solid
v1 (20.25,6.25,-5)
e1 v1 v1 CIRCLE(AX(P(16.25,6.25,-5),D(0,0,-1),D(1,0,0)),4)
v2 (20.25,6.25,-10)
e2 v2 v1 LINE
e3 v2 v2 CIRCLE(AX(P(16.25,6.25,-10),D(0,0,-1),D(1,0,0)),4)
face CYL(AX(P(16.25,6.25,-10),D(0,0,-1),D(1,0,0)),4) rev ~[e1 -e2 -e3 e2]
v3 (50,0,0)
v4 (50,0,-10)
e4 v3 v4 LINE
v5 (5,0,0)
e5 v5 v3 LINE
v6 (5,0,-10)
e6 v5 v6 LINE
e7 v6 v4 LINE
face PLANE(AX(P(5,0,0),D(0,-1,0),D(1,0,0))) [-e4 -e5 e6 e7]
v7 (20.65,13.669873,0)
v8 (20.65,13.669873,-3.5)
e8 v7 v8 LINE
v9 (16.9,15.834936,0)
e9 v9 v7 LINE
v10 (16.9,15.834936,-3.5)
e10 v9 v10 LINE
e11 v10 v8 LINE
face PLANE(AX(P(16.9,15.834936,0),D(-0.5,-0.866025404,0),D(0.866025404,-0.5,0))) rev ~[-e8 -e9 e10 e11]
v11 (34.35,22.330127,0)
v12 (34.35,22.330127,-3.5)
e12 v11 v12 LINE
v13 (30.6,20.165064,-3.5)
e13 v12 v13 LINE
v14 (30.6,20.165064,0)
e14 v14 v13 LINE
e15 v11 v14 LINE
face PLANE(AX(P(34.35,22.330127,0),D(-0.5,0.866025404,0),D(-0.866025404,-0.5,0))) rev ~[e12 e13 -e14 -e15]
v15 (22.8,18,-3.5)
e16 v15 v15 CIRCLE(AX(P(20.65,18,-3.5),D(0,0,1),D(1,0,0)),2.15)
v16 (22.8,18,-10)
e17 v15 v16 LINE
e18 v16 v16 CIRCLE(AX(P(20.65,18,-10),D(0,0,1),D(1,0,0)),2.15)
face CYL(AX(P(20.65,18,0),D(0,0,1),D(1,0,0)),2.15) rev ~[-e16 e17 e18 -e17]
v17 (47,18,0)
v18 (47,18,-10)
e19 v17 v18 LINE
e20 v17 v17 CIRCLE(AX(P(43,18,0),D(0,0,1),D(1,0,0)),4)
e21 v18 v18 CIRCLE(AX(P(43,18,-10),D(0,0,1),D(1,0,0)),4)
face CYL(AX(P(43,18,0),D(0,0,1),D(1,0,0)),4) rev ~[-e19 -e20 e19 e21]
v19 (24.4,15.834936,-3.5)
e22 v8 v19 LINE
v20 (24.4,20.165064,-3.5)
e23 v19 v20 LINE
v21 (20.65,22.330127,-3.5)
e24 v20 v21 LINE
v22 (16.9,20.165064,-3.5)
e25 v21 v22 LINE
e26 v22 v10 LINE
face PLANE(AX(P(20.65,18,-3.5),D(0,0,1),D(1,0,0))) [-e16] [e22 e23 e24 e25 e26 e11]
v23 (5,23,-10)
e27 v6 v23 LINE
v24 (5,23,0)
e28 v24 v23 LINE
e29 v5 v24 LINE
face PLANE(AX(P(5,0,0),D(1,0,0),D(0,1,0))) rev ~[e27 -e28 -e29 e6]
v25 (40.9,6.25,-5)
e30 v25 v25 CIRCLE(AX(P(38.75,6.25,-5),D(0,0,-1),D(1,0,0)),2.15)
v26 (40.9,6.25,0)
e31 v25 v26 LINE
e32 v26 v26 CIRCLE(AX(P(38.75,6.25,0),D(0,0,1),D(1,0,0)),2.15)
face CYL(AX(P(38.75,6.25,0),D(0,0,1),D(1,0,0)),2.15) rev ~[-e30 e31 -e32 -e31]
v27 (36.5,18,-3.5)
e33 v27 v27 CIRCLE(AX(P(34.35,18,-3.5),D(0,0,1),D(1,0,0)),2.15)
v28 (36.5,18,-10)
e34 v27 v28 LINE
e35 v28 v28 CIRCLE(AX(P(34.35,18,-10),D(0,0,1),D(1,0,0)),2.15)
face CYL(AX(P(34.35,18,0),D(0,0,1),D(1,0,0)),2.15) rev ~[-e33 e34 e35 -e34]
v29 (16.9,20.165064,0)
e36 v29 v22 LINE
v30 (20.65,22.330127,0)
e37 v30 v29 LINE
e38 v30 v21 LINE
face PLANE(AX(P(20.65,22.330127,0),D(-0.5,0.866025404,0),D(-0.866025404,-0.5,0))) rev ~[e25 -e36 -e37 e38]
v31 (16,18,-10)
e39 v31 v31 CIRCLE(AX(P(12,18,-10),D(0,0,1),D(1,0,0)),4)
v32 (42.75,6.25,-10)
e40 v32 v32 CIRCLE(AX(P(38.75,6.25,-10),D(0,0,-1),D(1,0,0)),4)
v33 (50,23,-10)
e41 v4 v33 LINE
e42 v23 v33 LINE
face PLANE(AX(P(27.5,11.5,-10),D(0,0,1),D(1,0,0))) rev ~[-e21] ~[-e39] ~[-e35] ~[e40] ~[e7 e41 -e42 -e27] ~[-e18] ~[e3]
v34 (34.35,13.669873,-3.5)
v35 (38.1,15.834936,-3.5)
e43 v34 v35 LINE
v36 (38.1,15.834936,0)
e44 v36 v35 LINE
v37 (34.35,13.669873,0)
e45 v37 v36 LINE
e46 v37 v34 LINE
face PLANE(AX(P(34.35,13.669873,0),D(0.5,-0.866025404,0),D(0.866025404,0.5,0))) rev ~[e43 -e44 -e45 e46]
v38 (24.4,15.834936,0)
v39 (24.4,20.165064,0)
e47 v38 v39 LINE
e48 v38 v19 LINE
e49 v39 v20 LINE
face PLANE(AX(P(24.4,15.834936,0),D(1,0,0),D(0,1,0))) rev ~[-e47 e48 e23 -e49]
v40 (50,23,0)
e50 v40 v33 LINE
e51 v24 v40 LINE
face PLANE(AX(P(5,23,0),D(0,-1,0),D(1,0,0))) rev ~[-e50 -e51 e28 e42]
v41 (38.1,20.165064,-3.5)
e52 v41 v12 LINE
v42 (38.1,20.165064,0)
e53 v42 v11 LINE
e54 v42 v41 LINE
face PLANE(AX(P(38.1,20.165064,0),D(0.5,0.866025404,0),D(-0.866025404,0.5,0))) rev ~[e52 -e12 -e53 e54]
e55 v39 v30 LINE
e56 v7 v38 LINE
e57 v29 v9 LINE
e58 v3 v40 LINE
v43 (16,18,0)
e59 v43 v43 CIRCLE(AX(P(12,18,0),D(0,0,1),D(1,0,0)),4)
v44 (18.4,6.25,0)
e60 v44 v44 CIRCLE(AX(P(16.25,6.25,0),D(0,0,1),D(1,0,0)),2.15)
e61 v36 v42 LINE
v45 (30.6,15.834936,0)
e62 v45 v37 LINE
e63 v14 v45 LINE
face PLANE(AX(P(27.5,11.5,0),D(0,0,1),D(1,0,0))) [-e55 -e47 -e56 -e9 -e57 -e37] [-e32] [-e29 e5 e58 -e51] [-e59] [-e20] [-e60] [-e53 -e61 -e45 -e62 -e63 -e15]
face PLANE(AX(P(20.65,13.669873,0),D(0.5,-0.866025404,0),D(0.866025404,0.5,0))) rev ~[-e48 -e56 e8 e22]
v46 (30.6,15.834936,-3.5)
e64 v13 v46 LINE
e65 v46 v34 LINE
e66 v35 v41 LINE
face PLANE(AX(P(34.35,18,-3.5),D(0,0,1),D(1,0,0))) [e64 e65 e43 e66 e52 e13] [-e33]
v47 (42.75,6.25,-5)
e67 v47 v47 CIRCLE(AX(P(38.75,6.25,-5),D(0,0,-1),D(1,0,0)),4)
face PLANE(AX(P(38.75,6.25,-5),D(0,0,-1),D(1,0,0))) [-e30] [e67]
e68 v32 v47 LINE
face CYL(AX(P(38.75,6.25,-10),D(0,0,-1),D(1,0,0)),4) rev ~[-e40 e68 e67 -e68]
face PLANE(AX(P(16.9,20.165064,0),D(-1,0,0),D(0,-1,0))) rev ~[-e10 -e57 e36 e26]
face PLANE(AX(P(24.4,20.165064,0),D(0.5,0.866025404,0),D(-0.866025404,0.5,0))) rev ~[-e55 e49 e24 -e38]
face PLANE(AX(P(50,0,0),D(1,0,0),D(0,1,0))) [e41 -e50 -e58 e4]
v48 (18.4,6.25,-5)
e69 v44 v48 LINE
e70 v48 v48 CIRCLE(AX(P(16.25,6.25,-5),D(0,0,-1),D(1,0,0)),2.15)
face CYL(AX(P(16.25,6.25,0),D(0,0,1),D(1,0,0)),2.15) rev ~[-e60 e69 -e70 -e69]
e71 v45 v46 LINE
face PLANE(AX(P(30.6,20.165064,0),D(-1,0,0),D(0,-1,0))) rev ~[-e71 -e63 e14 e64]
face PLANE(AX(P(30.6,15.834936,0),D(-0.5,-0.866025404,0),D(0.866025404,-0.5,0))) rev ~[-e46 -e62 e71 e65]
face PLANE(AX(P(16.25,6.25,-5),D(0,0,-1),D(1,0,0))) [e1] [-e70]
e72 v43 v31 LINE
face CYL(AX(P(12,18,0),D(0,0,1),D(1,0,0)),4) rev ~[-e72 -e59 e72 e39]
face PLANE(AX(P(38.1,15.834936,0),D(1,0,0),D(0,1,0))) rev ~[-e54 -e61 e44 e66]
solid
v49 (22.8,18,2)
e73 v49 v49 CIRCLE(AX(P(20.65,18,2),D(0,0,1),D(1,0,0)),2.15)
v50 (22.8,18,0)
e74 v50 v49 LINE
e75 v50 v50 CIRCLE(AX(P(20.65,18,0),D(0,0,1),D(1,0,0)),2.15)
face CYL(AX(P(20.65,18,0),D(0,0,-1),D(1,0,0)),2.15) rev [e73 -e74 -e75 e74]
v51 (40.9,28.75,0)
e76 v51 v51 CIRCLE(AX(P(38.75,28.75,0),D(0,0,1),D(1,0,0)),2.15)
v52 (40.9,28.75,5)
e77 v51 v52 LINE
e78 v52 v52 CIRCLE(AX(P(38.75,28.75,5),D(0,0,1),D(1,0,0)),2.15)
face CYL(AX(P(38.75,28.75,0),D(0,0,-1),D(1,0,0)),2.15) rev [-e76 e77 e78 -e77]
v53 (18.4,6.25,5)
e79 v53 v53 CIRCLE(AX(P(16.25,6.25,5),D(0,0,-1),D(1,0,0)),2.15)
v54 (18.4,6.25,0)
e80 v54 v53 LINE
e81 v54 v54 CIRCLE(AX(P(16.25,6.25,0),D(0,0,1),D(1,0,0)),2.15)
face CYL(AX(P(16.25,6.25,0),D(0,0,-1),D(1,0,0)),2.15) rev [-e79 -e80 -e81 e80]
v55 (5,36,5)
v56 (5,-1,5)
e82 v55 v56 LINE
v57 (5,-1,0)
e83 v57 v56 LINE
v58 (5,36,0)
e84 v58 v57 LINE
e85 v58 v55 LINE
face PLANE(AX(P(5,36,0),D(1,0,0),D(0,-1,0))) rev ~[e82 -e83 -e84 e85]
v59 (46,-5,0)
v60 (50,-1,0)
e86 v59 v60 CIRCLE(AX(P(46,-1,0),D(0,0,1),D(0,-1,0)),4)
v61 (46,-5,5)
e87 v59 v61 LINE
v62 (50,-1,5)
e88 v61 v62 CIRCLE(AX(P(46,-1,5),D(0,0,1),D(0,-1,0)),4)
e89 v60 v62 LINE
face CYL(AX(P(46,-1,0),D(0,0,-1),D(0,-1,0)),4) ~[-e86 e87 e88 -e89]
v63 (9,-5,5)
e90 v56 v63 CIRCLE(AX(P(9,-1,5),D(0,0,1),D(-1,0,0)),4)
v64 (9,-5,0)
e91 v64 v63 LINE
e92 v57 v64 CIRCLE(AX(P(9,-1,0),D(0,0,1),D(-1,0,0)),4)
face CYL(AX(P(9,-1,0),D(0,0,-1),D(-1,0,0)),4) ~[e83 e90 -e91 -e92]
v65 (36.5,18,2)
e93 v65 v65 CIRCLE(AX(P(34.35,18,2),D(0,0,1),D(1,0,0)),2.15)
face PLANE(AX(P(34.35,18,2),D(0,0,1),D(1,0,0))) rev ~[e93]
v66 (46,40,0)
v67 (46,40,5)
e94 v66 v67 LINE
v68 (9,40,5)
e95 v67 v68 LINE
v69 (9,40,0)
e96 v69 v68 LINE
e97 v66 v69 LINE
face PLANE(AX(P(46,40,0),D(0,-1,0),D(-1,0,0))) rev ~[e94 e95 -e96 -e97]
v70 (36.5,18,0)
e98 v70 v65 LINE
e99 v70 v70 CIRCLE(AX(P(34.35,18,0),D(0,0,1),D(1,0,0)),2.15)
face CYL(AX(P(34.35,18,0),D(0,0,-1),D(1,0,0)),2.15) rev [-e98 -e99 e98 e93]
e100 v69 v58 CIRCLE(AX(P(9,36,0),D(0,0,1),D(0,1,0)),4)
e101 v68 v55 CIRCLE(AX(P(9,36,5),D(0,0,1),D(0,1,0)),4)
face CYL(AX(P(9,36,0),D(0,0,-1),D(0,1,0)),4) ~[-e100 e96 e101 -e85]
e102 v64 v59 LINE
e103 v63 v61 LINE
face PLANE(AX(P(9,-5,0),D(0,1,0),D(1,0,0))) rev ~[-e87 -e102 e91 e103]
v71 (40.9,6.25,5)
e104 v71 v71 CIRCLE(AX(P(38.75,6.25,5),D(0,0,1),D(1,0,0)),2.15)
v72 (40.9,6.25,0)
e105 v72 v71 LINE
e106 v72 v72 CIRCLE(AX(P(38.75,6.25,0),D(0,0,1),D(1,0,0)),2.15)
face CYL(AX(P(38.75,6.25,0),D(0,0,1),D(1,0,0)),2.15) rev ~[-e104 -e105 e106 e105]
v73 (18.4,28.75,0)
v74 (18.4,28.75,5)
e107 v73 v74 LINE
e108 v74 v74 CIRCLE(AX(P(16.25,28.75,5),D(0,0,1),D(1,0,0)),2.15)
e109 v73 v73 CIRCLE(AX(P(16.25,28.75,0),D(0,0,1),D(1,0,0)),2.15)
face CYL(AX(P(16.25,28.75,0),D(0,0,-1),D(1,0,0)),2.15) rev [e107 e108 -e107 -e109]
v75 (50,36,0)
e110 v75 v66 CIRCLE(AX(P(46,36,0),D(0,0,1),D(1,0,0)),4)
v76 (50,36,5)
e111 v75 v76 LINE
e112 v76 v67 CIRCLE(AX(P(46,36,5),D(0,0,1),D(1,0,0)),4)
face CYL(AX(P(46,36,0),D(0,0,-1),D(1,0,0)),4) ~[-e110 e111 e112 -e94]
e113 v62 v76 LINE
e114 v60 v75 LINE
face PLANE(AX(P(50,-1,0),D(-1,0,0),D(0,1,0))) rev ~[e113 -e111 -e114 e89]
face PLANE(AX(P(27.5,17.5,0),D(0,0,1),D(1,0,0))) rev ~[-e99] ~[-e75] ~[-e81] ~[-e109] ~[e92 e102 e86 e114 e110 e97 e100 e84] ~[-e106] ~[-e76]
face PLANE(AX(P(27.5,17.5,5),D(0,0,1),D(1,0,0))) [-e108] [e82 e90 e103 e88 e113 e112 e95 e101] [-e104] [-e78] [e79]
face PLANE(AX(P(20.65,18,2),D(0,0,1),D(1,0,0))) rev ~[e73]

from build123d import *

# Parameters (mm, degrees)
F0_R     = 2.15
F2_DEPTH = 5
F1_W     = 45
F1_H     = 23
F1_R     = 4
F1_R_2   = 2.15
F3_DEPTH = 10
F4_DEPTH = 3.5
F5_DEPTH = 2
F6_DEPTH = 10
F7_R     = 4
F7_R_2   = 2.15
F8_DEPTH = 5


# Not quite as in the source:
# - a feature names something its author has since deleted; it is built from what else it names


with BuildPart() as f2:
    # F0 (on Top) → F2 (new body)
    with BuildSketch(Plane.XY):
        with BuildLine():
            ThreePointArc((5, -1), (6.1715728753, -3.8284271247), (9, -5))
            Line((9, -5), (46, -5))
            ThreePointArc((46, -5), (48.8284271247, -3.8284271247), (50, -1))
            Line((50, -1), (50, 36))
            ThreePointArc((50, 36), (48.8284271247, 38.8284271247), (46, 40))
            Line((46, 40), (9, 40))
            ThreePointArc((9, 40), (6.1715728753, 38.8284271247), (5, 36))
            Line((5, 36), (5, -1))
        make_face()
        with Locations((16.25, 6.25)):
            Circle(F0_R, mode=Mode.SUBTRACT)
        with Locations((38.75, 6.25)):
            Circle(F0_R, mode=Mode.SUBTRACT)
        with Locations((16.25, 28.75)):
            Circle(F0_R, mode=Mode.SUBTRACT)
        with Locations((38.75, 28.75)):
            Circle(F0_R, mode=Mode.SUBTRACT)
        with Locations((16.25, 6.25)):
            Circle(F0_R)
        with Locations((38.75, 6.25)):
            Circle(F0_R)
    extrude(amount=F2_DEPTH)

    # F1 (on Top) → F5 (cut)
    with BuildSketch(Plane.XY):
        with Locations((34.35, 18)):
            Circle(F1_R_2)
        with Locations((20.65, 18)):
            Circle(F1_R_2)
    extrude(amount=F5_DEPTH, mode=Mode.SUBTRACT)


with BuildPart() as f3:
    # F1 (on Top) → F3 (new body)
    with BuildSketch(Plane.XY):
        with Locations((27.5, 11.5)):
            Rectangle(F1_W, F1_H)
        with Locations((12, 18)):
            Circle(F1_R, mode=Mode.SUBTRACT)
        Polygon((20.65, 22.3301270189), (24.4, 20.1650635095), (24.4, 15.8349364905), (20.65, 13.6698729811), (16.9, 15.8349364905), (16.9, 20.1650635095), align=None, mode=Mode.SUBTRACT)
        Polygon((34.35, 13.6698729811), (30.6, 15.8349364905), (30.6, 20.1650635095), (34.35, 22.3301270189), (38.1, 20.1650635095), (38.1, 15.8349364905), align=None, mode=Mode.SUBTRACT)
        with Locations((43, 18)):
            Circle(F1_R, mode=Mode.SUBTRACT)
        Polygon((24.4, 15.8349364905), (24.4, 20.1650635095), (20.65, 22.3301270189), (16.9, 20.1650635095), (16.9, 15.8349364905), (20.65, 13.6698729811), align=None)
        with Locations((20.65, 18)):
            Circle(F1_R_2, mode=Mode.SUBTRACT)
        Polygon((30.6, 20.1650635095), (30.6, 15.8349364905), (34.35, 13.6698729811), (38.1, 15.8349364905), (38.1, 20.1650635095), (34.35, 22.3301270189), align=None)
        with Locations((34.35, 18)):
            Circle(F1_R_2, mode=Mode.SUBTRACT)
    extrude(amount=-F3_DEPTH)

    # F1 (on Top) → F4 (cut)
    with BuildSketch(Plane.XY):
        Polygon((24.4, 15.8349364905), (24.4, 20.1650635095), (20.65, 22.3301270189), (16.9, 20.1650635095), (16.9, 15.8349364905), (20.65, 13.6698729811), align=None)
        with Locations((20.65, 18)):
            Circle(F1_R_2, mode=Mode.SUBTRACT)
        Polygon((30.6, 20.1650635095), (30.6, 15.8349364905), (34.35, 13.6698729811), (38.1, 15.8349364905), (38.1, 20.1650635095), (34.35, 22.3301270189), align=None)
        with Locations((34.35, 18)):
            Circle(F1_R_2, mode=Mode.SUBTRACT)
    extrude(amount=-F4_DEPTH, mode=Mode.SUBTRACT)


with BuildPart() as f6_tool:
    # F0 (on Top) → F6 (new body, symmetric)
    with BuildSketch(Plane.XY):
        with Locations((16.25, 6.25)):
            Circle(F0_R)
        with Locations((38.75, 6.25)):
            Circle(F0_R)
    extrude(amount=F6_DEPTH, both=True)


with BuildPart() as f2_1:
    add(f2.part)

    # F6: cut by f6_tool
    add(f6_tool.part, mode=Mode.SUBTRACT)


with BuildPart() as f3_1:
    add(f3.part)

    # F6: cut by f6_tool
    add(f6_tool.part, mode=Mode.SUBTRACT)

    # F7 (on face) → F8 (cut)
    with BuildSketch(Plane(origin=(0, 0, -10), x_dir=(1, 0, 0), z_dir=(0, 0, -1))):
        with Locations((16.25, -6.25)):
            Circle(F7_R)
        with Locations((16.25, -6.25)):
            Circle(F7_R_2, mode=Mode.SUBTRACT)
        with Locations((38.75, -6.25)):
            Circle(F7_R)
        with Locations((38.75, -6.25)):
            Circle(F7_R_2, mode=Mode.SUBTRACT)
    extrude(amount=-F8_DEPTH, mode=Mode.SUBTRACT)


solid = Compound([f2_1.part, f3_1.part])
